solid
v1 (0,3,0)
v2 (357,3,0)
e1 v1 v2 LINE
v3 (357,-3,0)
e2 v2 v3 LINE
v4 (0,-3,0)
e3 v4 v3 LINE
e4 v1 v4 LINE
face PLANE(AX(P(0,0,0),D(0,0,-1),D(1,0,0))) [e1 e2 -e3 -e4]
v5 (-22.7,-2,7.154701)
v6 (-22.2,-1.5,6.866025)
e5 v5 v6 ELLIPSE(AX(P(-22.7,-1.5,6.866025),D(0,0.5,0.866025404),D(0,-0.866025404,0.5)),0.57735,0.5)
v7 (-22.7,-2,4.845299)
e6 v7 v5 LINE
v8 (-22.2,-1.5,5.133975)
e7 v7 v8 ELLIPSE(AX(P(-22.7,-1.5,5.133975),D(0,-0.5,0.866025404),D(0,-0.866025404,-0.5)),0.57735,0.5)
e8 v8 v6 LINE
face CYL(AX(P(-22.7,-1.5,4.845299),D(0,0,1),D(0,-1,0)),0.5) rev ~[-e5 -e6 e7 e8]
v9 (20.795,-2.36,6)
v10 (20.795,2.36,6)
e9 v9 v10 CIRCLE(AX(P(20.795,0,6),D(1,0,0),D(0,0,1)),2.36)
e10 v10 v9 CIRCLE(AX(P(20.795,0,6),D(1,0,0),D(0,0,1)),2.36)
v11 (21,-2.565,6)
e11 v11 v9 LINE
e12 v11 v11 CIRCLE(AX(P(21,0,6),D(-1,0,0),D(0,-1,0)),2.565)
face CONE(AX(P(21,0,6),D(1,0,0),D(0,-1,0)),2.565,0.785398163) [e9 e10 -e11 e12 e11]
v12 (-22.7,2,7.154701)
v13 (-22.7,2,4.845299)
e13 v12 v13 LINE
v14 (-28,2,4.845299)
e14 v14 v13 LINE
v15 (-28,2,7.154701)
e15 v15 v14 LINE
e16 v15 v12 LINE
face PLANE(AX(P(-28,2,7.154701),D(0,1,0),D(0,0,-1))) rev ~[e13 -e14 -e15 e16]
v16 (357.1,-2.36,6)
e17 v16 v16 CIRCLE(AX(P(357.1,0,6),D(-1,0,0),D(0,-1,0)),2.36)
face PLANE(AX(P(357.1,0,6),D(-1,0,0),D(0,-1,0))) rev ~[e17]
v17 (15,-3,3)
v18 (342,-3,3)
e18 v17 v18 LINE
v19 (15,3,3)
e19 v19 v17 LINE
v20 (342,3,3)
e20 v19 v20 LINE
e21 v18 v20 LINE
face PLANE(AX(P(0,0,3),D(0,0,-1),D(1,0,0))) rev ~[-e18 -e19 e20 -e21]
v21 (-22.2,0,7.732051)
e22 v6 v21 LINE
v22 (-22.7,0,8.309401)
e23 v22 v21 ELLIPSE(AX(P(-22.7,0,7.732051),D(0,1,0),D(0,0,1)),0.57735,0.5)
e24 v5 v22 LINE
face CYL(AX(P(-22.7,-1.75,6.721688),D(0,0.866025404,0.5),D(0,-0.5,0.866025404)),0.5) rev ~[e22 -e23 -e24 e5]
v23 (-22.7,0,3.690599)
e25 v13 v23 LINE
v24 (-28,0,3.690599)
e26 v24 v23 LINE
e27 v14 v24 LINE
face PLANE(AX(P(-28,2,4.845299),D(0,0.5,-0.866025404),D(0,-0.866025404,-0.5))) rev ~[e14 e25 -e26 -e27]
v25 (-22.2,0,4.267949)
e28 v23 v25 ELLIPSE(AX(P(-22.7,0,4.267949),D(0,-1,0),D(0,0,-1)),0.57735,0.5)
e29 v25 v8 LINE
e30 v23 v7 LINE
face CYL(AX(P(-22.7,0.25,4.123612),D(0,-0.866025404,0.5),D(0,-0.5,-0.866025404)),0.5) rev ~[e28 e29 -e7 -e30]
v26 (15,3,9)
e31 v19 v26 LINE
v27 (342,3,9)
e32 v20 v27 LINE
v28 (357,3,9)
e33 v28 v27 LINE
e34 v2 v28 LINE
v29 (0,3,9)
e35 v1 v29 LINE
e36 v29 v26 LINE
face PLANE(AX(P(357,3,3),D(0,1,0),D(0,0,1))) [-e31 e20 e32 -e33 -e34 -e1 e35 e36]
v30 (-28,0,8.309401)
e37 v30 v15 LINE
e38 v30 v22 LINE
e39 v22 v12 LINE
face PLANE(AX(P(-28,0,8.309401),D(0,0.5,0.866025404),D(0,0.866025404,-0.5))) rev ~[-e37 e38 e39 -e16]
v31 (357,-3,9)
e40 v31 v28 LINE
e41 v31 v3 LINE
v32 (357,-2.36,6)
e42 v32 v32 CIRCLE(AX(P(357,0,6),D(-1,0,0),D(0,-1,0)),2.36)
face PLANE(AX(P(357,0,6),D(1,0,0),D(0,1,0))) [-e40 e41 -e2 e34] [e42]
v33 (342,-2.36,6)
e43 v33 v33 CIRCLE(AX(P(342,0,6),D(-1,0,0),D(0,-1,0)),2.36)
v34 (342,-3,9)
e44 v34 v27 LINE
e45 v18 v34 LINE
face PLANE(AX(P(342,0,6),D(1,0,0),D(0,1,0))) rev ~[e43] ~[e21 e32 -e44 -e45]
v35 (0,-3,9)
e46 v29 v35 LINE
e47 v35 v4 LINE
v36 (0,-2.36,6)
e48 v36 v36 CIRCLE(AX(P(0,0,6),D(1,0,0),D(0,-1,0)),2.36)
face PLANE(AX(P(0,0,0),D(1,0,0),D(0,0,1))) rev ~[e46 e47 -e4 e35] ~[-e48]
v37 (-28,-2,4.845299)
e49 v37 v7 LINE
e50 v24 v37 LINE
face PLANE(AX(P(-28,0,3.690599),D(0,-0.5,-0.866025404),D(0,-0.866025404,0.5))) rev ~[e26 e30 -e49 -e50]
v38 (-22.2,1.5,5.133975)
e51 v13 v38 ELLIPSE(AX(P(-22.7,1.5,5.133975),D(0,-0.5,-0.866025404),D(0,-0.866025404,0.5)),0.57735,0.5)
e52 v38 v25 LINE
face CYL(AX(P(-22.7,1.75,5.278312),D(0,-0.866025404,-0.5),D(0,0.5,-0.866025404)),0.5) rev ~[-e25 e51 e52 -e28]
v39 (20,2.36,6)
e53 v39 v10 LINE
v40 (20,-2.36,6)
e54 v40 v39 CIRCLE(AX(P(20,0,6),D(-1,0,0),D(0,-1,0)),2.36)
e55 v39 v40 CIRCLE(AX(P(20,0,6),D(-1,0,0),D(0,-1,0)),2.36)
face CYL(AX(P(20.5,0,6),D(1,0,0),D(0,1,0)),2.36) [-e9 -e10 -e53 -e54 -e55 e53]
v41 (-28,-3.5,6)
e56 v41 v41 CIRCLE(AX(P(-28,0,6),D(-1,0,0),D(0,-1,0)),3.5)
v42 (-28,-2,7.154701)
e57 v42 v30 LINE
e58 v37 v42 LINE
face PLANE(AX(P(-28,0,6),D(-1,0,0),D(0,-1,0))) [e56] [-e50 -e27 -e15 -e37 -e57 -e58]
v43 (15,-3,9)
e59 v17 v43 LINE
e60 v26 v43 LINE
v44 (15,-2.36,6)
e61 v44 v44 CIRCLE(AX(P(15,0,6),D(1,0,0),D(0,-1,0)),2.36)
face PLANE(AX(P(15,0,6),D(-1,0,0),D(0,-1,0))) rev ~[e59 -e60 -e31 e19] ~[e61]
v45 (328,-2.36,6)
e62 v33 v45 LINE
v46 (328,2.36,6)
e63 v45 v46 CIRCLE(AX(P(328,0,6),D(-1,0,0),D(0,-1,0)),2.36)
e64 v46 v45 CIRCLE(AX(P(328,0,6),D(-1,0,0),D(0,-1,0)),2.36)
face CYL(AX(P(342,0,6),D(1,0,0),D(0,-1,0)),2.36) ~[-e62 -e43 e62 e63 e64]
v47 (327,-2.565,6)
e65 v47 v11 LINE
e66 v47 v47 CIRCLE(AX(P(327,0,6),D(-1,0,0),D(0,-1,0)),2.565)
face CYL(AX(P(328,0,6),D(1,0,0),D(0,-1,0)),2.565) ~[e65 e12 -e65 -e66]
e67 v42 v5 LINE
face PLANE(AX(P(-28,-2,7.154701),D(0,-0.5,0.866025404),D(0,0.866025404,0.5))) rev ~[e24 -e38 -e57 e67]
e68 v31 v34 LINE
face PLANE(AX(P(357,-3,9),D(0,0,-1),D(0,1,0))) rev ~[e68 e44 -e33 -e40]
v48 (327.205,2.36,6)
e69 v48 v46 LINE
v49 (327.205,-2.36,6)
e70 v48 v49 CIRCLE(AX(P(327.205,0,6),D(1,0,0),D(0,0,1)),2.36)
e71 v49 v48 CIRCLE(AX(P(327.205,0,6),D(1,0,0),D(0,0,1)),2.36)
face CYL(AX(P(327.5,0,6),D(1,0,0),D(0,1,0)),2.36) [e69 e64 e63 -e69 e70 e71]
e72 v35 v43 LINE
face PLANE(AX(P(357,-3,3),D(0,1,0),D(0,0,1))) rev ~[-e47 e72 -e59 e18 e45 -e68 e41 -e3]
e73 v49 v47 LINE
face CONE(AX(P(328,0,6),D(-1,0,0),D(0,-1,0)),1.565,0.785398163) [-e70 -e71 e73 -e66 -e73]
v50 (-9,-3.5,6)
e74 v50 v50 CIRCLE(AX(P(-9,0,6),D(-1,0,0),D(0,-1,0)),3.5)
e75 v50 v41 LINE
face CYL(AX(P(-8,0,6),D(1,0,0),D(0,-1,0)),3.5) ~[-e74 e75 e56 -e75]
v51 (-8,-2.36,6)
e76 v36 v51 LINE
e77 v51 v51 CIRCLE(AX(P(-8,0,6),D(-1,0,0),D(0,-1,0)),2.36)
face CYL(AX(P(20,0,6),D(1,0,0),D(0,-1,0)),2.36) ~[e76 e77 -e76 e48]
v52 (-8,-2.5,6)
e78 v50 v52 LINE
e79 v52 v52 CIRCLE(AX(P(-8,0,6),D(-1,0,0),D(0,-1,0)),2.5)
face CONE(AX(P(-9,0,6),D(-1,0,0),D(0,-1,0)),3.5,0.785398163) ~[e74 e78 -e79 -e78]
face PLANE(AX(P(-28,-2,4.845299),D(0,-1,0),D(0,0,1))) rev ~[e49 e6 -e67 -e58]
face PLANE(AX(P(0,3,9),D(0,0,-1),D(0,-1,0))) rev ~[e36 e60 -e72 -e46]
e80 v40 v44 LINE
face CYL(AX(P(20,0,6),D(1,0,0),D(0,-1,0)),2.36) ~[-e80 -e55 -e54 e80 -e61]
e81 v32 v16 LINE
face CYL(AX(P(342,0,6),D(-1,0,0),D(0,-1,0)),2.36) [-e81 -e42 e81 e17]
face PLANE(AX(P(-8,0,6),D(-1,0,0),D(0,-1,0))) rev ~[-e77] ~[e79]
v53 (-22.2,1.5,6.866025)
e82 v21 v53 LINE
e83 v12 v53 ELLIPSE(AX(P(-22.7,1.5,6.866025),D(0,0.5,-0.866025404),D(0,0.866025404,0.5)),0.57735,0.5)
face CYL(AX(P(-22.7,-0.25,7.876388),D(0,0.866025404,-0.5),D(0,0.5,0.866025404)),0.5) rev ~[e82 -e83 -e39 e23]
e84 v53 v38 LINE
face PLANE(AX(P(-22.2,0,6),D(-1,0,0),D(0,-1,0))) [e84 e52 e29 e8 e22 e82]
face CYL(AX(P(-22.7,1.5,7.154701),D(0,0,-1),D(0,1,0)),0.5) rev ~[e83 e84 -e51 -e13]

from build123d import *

# Parameters (mm, degrees)
F0_W            = 357
F0_H            = 3
F1_DEPTH        = 3
F2_W            = 6
F2_H            = 6
F3_DEPTH        = 15
F4_W            = 6
F4_H            = 6
F5_DEPTH        = 15
F6_R            = 2.36
F7_DEPTH        = 14
F8_R            = 2.565
F9_DEPTH        = 308
F10_R           = 2.36
F11_DEPTH       = 28
F12_DEPTH       = 15.1
F13_R           = 3.5
F14_DEPTH       = 20
F15_2_S5_R      = 2.36
F15_2_T6_DEPTH  = 5
F15_2_S11_R     = 2.36
F15_2_T12_DEPTH = 5
F17_DEPTH       = 5.8
F18_R           = 0.5


# Not quite as in the source:
# - a fillet or chamfer that OpenCascade refuses, or shapes differently, is made with other operations: its cross-section is extruded or revolved along the edge and cut away or added


with BuildPart() as f1:
    # F0 (on Front) → F1 (new body, symmetric)
    with BuildSketch(Plane.XZ):
        with Locations((178.5, 1.5)):
            Rectangle(F0_W, F0_H)
    extrude(amount=F1_DEPTH, both=True)


with BuildPart() as f3:
    # F2 (on face) → F3 (new body)
    with BuildSketch(Plane.YZ.offset(357)):
        with Locations((0, 6)):
            Rectangle(F2_W, F2_H)
    extrude(amount=-F3_DEPTH)



with BuildPart() as f5:
    # F4 (on face) → F5 (new body)
    with BuildSketch(Plane(origin=(0, 0, 0), x_dir=(0, -1, 0), z_dir=(-1, 0, 0))):
        with Locations((0, 6)):
            Rectangle(F4_W, F4_H)
    extrude(amount=-F5_DEPTH)



with BuildPart() as f7:
    # F6 (on face) → F7 (new body)
    with BuildSketch(Plane(origin=(342, 0, 0), x_dir=(0, -1, 0), z_dir=(-1, 0, 0))):
        with Locations((0, 6)):
            Circle(F6_R)
    extrude(amount=F7_DEPTH)

    # F8 (on face) → F9 (join)
    with BuildSketch(Plane(origin=(328, 0, 0), x_dir=(0, -1, 0), z_dir=(-1, 0, 0))):
        with Locations((0, 6)):
            Circle(F8_R)
    extrude(amount=F9_DEPTH)


with BuildPart() as f5_1:
    add(f5.part)

    add(f7.part)  # F11 merges F7
    # F10 (on face) → F11 (join)
    with BuildSketch(Plane(origin=(20, 0, 0), x_dir=(0, -1, 0), z_dir=(-1, 0, 0))):
        with Locations((0, 6)):
            Circle(F10_R)
    extrude(amount=F11_DEPTH)


with BuildPart() as f3_1:
    add(f3.part)

    add(f5_1.part)  # F12 merges F5
    # F6 (on face) → F12 (join)
    with BuildSketch(Plane(origin=(342, 0, 0), x_dir=(0, -1, 0), z_dir=(-1, 0, 0))):
        with Locations((0, 6)):
            Circle(F6_R)
    extrude(amount=-F12_DEPTH)

    # F15#2: chamfer of 1 on 2 edges, made by hand


with BuildPart() as f14:
    # F13 (on face) → F14 (new body)
    with BuildSketch(Plane(origin=(-8, 0, 0), x_dir=(0, -1, 0), z_dir=(-1, 0, 0))):
        with Locations((0, 6)):
            Circle(F13_R)
    extrude(amount=F14_DEPTH)

    # F15: chamfer of 1 on 1 edges, made by hand

    # F15_s1 → F15_t2 (revolve, cut)
    with BuildSketch(Plane.XY.offset(6)):
        Polygon((-9, -3.5), (-8, -2.5), (-8, -3.5), align=None)
    revolve(axis=Axis((-8, 0, 6), (-1, 0, 0)), mode=Mode.SUBTRACT)

    # F16 (on face) → F17 (cut)
    with BuildSketch(Plane(origin=(-28, 0, 0), x_dir=(0, -1, 0), z_dir=(-1, 0, 0))):
        Polygon((0, 3.6905989232), (2, 4.8452994616), (2, 7.1547005384), (0, 8.3094010768), (-2, 7.1547005384), (-2, 4.8452994616), align=None)
    extrude(amount=-F17_DEPTH, mode=Mode.SUBTRACT)

    # F18
    f18_edges = [f14.edges().sort_by_distance(p)[0] for p in [
        (-22.2, 1, 4.267949),
        (-22.2, -1, 4.267949),
        (-22.2, -2, 6),
        (-22.2, -1, 7.732051),
        (-22.2, 1, 7.732051),
        (-22.2, 2, 6),
    ]]
    fillet(f18_edges, radius=F18_R)


with BuildPart() as f15_2_tool2:
    # F15_2_s3 → F15_2_t4 (revolve)
    with BuildSketch(Plane.XY.offset(6)):
        Polygon((21, -2.565), (20, -1.565), (20, -2.565), align=None)
    revolve(axis=Axis((20, 0, 6), (-1, 0, 0)))

    # F15_2_s5 → F15_2_t6 (cut, symmetric)
    with BuildSketch(Plane.YZ.offset(20.5)):
        with Locations((0, 6)):
            Circle(F15_2_S5_R)
    extrude(amount=F15_2_T6_DEPTH, both=True, mode=Mode.SUBTRACT)


with BuildPart() as f3_2:
    add(f3_1.part)

    # F15_2_t1: cut F15_2_tool2
    add(f15_2_tool2.part, mode=Mode.SUBTRACT)


with BuildPart() as f15_2_tool8:
    # F15_2_s9 → F15_2_t10 (revolve)
    with BuildSketch(Plane.XY.offset(6)):
        Polygon((328, -1.565), (327, -2.565), (328, -2.565), align=None)
    revolve(axis=Axis((328, 0, 6), (-1, 0, 0)))

    # F15_2_s11 → F15_2_t12 (cut, symmetric)
    with BuildSketch(Plane.YZ.offset(327.5)):
        with Locations((0, 6)):
            Circle(F15_2_S11_R)
    extrude(amount=F15_2_T12_DEPTH, both=True, mode=Mode.SUBTRACT)


with BuildPart() as f3_3:
    add(f3_2.part)

    # F15_2_t7: cut F15_2_tool8
    add(f15_2_tool8.part, mode=Mode.SUBTRACT)


with BuildPart() as f1_1:
    add(f1.part)

    # F19: union F3, F14
    add(f3_3.part)
    add(f14.part)


solid = f1_1.part
